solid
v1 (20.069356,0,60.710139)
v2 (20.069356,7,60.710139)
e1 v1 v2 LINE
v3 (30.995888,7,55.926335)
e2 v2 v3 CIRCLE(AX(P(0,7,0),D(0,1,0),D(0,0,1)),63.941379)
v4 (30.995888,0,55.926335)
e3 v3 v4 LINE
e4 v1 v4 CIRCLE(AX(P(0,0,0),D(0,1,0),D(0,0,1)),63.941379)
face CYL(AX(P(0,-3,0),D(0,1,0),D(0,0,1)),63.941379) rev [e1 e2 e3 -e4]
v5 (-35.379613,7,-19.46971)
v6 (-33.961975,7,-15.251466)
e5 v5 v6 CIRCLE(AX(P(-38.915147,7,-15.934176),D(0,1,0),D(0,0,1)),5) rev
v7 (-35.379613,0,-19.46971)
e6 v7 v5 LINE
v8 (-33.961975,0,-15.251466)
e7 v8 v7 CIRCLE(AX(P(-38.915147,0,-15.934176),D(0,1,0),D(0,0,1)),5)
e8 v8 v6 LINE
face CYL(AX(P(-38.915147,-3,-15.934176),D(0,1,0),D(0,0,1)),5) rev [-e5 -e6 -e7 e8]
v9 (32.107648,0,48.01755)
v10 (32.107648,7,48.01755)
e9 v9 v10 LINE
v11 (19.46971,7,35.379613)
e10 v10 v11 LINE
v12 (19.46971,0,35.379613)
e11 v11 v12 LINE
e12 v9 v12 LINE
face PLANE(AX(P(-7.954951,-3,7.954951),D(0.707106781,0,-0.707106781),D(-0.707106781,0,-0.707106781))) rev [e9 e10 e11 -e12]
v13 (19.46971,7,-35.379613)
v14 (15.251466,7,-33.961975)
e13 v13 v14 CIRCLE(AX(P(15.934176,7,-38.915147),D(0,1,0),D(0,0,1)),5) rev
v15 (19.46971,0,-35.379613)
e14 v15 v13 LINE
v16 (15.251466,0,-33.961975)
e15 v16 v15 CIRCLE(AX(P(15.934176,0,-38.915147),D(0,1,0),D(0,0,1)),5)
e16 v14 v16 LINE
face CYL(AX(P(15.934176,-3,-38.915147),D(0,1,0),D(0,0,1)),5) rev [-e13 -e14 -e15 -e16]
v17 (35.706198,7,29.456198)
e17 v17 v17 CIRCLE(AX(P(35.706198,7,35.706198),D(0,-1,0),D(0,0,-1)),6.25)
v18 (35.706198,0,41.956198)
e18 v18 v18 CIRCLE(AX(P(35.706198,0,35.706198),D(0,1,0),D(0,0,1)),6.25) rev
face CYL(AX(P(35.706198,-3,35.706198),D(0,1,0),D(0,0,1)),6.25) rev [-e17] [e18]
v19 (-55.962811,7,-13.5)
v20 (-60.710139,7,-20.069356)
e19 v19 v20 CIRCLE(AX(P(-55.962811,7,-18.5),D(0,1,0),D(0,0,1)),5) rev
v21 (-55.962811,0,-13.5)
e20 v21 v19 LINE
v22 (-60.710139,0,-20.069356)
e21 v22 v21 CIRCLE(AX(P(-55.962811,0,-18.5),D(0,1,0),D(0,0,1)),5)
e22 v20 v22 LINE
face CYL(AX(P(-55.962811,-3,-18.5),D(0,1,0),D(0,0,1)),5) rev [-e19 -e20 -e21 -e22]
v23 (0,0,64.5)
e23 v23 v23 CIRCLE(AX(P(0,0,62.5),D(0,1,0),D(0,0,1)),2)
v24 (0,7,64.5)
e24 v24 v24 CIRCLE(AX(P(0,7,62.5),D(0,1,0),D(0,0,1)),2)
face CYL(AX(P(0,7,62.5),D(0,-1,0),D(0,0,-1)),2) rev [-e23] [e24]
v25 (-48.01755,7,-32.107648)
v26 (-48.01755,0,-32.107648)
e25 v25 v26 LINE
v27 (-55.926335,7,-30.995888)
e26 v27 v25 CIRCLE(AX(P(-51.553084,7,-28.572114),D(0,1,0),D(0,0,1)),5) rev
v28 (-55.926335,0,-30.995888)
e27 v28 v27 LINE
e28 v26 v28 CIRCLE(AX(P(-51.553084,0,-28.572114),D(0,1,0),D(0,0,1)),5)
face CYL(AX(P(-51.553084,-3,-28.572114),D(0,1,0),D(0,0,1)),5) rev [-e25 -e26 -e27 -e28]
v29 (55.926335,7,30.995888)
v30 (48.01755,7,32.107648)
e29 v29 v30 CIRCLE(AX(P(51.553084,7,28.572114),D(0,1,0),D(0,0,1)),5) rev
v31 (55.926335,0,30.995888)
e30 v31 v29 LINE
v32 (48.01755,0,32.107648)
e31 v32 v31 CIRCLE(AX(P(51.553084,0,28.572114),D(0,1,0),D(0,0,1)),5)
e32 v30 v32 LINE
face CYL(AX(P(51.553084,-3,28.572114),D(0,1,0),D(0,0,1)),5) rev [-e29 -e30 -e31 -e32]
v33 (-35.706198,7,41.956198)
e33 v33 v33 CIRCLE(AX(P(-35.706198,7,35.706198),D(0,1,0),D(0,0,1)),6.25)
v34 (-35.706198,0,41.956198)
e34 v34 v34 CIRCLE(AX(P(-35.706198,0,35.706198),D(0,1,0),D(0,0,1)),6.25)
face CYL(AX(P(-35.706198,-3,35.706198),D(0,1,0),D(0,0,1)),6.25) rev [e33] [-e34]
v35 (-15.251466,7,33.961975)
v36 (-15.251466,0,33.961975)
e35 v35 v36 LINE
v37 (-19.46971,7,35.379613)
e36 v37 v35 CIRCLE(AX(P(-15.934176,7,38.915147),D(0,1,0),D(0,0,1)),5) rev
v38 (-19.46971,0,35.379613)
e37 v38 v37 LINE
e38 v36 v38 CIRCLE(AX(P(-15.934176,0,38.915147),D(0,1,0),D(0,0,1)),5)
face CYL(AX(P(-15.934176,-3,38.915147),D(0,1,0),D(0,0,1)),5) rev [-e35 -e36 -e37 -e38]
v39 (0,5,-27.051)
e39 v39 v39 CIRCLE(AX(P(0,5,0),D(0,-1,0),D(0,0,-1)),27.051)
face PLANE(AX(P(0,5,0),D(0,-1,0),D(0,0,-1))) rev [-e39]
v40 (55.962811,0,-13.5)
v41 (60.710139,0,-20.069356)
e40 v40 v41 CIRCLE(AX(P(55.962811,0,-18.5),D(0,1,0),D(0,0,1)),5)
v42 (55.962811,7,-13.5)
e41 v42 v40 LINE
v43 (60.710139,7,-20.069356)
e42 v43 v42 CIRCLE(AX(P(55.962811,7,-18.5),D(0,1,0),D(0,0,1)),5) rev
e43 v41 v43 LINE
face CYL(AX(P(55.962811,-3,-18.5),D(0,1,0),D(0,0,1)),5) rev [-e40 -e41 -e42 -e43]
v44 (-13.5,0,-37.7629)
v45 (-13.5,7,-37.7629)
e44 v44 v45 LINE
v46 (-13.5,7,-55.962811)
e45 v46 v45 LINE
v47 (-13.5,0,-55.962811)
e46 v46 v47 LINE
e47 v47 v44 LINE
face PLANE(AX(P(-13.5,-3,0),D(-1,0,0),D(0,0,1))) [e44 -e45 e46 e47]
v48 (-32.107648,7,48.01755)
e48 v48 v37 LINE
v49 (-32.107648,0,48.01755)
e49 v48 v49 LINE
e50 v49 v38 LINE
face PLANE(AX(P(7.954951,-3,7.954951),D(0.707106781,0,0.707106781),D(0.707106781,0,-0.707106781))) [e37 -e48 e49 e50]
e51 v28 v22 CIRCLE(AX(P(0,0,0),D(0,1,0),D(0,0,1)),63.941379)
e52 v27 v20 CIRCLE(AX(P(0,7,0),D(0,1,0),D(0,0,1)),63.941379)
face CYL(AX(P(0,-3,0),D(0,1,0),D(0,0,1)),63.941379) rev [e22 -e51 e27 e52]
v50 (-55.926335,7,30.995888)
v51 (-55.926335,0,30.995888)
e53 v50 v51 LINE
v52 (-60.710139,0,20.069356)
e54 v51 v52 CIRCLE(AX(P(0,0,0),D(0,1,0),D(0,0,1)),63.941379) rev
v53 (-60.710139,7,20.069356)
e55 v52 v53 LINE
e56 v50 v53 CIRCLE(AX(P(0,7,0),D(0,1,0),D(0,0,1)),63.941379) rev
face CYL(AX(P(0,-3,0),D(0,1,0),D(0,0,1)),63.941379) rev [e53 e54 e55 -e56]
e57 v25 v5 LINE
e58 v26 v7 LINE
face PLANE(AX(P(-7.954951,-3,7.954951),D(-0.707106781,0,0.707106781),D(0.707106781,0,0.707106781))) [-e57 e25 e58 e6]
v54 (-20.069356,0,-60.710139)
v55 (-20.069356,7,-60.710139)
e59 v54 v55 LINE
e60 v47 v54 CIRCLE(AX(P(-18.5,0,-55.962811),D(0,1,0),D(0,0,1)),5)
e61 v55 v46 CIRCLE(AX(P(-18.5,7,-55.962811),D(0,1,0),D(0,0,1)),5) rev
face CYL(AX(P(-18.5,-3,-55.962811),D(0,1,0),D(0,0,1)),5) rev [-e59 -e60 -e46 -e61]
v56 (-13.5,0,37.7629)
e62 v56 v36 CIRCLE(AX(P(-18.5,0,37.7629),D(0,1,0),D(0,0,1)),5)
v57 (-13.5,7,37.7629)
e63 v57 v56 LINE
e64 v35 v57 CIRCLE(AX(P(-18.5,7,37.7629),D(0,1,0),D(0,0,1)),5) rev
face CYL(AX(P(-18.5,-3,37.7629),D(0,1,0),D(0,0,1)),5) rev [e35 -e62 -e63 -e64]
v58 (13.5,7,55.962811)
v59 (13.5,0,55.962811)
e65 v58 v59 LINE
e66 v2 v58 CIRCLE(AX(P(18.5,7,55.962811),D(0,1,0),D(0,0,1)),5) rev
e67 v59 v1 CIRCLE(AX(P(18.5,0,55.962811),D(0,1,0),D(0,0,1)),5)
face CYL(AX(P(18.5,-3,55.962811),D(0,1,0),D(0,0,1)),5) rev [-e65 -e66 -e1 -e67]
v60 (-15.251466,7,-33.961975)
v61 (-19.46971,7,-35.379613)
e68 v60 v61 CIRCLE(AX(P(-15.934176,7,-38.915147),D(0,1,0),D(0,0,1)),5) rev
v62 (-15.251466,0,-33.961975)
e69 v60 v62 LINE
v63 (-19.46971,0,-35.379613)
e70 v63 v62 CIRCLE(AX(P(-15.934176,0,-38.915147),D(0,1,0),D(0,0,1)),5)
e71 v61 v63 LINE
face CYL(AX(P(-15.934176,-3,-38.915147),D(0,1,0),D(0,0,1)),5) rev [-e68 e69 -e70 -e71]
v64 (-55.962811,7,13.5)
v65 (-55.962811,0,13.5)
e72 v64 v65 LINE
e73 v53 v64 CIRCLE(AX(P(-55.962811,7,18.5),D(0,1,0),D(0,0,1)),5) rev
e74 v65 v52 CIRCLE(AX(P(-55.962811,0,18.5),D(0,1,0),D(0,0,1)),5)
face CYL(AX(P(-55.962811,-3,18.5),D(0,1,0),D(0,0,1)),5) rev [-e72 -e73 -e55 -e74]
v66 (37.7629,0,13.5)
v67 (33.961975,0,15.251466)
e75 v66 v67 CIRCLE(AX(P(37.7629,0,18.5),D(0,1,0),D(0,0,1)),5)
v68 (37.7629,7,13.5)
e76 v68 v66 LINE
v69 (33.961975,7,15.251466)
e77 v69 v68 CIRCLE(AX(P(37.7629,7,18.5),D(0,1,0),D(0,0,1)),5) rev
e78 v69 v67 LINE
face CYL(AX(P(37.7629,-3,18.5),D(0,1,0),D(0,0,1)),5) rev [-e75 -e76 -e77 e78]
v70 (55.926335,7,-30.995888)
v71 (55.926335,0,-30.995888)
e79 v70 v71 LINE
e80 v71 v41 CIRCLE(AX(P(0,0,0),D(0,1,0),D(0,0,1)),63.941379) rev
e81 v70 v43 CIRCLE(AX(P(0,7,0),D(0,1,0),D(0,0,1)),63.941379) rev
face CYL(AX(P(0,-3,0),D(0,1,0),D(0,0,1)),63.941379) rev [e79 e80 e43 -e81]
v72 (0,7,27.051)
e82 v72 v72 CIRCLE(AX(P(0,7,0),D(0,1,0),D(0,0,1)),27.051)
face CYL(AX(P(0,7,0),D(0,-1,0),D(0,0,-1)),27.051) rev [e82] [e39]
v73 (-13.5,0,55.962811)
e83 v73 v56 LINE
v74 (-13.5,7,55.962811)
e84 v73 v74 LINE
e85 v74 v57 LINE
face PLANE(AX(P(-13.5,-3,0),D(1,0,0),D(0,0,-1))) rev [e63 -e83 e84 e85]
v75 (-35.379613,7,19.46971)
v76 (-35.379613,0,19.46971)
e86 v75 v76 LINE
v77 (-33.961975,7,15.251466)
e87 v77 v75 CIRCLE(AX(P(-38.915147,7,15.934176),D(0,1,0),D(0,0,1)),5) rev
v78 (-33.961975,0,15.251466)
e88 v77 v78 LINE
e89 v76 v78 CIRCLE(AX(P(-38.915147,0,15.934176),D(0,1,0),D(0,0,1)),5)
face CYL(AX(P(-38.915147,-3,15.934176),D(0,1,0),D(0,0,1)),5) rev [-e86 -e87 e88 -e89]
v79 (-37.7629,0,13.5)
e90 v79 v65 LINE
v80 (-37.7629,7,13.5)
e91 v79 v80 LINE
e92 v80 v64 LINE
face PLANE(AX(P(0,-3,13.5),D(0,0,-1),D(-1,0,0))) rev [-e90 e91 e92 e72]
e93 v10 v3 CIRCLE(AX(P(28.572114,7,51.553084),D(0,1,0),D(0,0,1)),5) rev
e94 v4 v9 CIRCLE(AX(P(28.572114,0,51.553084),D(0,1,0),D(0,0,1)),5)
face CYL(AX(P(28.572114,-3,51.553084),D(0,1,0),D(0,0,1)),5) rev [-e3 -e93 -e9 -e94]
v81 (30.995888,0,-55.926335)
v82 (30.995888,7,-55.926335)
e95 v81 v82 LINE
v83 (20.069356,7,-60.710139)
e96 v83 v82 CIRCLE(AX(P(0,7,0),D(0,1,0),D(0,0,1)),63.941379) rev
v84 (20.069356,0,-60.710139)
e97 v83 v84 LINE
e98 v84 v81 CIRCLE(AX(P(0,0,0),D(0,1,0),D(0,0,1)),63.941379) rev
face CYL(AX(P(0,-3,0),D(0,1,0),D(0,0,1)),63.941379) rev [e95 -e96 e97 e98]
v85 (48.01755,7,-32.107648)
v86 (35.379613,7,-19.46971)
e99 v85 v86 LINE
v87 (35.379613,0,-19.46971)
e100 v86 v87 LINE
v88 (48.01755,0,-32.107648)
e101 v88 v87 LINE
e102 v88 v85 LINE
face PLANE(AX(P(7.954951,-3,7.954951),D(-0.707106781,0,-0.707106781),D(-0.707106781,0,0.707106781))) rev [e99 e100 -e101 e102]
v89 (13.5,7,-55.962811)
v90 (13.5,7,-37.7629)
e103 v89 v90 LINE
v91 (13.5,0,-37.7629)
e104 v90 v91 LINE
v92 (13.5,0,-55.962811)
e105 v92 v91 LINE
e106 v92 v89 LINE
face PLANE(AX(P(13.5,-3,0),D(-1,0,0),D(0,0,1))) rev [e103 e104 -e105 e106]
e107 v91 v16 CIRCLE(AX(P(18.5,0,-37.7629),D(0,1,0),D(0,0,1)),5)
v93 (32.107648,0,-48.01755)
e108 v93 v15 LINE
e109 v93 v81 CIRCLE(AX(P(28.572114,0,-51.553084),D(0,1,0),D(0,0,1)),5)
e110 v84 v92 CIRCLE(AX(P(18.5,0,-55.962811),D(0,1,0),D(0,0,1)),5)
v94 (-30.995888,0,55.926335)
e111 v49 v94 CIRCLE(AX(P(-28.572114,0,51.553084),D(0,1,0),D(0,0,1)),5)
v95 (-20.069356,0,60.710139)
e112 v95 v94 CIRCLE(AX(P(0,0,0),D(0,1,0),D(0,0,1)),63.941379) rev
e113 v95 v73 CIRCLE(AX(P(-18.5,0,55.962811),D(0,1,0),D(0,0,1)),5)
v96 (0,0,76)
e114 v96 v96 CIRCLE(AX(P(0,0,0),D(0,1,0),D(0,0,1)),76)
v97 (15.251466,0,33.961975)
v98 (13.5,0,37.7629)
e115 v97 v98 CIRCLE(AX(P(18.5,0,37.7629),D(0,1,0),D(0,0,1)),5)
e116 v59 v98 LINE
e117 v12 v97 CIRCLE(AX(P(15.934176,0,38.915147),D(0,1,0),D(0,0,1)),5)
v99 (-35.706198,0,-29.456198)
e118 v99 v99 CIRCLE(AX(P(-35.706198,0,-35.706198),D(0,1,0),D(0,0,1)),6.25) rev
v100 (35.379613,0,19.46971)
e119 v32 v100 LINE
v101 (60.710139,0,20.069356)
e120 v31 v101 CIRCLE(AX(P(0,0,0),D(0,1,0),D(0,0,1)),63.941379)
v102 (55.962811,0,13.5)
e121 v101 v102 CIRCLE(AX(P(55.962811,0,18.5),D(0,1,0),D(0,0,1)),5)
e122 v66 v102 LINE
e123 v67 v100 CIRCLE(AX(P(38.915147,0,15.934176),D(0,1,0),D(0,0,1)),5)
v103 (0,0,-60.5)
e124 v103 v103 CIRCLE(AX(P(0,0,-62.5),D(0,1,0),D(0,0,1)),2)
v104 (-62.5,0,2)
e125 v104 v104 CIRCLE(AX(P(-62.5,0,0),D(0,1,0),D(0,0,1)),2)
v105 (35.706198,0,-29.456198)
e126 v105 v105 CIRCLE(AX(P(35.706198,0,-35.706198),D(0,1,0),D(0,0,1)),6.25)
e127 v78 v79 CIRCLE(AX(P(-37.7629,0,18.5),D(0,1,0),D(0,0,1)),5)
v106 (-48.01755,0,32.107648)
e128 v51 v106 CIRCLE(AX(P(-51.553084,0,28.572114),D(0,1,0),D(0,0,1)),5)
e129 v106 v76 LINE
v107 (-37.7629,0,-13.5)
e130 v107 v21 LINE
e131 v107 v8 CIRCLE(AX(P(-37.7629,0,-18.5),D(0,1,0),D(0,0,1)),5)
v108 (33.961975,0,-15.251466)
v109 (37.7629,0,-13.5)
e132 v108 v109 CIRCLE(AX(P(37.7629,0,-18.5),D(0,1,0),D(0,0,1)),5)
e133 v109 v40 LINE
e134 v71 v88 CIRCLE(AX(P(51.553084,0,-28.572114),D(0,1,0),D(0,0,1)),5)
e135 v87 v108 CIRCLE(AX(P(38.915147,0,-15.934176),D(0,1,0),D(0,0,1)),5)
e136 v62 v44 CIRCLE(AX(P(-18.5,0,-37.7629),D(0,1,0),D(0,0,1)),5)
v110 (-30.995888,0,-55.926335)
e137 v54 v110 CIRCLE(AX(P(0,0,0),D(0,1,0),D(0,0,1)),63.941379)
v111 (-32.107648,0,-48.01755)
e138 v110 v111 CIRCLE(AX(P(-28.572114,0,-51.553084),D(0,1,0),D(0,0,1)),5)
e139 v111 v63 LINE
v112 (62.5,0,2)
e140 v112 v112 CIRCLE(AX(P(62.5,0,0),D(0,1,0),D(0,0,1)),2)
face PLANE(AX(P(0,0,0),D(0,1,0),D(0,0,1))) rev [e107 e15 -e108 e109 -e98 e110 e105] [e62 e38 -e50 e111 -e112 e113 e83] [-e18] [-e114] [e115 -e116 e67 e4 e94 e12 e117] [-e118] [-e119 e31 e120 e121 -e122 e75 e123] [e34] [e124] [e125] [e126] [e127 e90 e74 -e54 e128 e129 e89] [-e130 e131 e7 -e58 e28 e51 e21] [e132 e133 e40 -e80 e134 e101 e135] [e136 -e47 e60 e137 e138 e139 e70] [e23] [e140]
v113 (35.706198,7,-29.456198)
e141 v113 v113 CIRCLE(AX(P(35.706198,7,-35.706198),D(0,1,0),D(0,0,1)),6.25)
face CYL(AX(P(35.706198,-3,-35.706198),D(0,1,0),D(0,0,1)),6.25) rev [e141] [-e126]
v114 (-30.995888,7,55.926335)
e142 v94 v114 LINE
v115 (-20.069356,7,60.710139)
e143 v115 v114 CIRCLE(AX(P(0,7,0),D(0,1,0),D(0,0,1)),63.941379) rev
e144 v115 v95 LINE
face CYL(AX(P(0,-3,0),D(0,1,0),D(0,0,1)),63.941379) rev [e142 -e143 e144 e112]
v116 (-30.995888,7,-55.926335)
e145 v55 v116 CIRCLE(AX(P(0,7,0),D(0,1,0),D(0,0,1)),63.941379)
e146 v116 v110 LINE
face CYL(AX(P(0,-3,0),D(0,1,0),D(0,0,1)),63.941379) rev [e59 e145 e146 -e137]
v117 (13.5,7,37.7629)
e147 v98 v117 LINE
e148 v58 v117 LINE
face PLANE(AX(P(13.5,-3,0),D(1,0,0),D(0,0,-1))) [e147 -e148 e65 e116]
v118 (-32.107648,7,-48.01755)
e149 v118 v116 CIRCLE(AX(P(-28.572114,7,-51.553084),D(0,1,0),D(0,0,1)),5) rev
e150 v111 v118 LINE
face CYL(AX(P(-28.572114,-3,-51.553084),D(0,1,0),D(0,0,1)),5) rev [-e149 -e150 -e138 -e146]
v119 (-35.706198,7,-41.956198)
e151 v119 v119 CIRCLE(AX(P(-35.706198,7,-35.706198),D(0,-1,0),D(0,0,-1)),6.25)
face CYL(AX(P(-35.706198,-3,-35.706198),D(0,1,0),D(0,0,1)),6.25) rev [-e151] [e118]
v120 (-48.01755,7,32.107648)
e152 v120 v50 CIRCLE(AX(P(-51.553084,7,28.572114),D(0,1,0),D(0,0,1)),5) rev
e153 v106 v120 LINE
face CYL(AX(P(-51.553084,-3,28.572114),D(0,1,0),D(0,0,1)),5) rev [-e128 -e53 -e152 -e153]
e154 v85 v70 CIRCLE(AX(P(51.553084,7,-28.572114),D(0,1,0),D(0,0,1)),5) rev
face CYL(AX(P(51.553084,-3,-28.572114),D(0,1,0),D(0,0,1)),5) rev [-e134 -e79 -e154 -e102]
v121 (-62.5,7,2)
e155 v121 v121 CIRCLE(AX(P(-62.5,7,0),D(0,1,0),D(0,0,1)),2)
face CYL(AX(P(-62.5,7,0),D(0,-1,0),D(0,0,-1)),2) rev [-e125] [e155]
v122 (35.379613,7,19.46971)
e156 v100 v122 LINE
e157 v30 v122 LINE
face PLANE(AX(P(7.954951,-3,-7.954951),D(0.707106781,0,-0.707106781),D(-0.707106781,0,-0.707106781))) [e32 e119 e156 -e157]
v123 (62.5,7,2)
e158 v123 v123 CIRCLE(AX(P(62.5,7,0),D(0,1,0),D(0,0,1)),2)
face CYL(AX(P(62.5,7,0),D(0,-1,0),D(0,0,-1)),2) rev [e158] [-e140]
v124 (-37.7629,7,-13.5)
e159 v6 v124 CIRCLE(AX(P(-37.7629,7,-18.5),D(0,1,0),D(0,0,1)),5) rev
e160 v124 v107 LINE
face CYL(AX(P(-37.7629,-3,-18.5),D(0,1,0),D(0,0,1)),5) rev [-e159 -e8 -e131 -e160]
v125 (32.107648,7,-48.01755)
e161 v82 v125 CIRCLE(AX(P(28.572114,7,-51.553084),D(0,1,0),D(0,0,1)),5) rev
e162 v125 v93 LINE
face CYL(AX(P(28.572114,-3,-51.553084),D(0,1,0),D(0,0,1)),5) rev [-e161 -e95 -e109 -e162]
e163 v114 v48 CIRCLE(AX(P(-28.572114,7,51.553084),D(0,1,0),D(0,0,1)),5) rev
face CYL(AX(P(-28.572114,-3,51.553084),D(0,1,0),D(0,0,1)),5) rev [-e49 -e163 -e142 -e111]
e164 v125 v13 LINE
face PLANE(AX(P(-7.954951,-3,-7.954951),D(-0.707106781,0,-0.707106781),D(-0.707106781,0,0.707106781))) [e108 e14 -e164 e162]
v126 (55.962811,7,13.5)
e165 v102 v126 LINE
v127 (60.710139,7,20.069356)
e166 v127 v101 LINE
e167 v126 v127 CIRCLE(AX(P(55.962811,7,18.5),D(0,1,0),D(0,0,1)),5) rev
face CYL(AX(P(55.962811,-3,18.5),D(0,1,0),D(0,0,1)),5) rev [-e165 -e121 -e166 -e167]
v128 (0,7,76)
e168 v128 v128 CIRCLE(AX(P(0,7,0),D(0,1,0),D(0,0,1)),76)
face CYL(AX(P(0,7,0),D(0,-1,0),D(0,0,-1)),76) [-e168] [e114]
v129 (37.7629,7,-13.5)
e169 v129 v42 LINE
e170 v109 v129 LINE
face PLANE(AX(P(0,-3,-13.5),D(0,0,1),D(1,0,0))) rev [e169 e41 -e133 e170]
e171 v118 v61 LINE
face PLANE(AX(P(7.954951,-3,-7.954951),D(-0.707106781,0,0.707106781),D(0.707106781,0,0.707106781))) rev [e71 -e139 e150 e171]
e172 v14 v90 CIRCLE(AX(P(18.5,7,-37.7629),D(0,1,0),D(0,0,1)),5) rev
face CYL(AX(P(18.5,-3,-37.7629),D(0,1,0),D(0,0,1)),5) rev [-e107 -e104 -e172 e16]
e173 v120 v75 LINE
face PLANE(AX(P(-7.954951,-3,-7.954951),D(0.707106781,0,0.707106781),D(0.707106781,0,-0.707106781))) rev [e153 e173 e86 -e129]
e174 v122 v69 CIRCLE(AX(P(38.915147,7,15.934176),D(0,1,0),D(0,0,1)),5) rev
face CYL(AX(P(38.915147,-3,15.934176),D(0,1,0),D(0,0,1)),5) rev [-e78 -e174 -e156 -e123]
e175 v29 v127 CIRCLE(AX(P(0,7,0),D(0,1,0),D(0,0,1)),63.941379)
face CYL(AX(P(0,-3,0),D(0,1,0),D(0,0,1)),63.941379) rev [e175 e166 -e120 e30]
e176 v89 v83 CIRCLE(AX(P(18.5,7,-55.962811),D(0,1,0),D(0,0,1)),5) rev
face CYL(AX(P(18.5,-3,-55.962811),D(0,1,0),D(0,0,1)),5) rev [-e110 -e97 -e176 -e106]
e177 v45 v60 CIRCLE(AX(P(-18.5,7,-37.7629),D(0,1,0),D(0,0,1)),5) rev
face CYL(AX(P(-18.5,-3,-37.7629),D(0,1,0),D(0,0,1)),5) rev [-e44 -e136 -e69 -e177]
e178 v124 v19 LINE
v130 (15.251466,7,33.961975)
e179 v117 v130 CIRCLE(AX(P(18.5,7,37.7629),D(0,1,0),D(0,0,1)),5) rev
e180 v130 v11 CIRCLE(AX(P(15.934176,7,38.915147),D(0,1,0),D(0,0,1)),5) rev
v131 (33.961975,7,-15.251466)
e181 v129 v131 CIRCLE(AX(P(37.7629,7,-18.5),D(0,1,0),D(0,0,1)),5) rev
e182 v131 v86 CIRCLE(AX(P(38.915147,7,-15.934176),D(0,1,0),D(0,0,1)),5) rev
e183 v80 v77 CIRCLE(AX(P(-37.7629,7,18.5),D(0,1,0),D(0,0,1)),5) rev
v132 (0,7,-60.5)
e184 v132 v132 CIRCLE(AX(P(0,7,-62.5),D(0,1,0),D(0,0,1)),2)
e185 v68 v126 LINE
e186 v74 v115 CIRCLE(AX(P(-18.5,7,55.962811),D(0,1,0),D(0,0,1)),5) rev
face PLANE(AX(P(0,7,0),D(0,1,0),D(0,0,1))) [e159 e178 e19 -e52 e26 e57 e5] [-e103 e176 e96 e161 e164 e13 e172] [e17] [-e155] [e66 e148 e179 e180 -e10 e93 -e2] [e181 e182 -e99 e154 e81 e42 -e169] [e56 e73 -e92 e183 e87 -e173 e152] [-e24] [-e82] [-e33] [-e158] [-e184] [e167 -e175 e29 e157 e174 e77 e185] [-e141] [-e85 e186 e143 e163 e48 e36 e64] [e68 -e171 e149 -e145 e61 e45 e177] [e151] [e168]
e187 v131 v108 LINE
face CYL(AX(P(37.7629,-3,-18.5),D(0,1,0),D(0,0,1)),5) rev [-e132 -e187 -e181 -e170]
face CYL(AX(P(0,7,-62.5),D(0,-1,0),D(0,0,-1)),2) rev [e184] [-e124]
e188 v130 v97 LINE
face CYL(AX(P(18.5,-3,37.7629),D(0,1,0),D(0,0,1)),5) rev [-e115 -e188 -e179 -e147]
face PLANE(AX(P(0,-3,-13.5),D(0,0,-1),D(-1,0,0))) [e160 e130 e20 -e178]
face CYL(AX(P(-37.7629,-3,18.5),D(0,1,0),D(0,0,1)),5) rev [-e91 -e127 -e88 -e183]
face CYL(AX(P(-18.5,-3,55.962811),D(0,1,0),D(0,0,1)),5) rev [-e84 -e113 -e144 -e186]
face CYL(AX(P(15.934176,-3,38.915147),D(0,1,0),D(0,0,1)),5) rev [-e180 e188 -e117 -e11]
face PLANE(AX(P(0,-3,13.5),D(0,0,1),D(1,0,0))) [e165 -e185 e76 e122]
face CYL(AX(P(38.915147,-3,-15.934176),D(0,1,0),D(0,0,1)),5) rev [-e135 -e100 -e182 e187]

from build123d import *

# Parameters (mm, degrees)
SKETCH1_R           = 76
SKETCH1_R_2         = 27.051
SKETCH1_R_3         = 2
BOSS_EXTRUDE1_DEPTH = 7
SKETCH3_R           = 27.051
BOSS_EXTRUDE2_DEPTH = 5
SKETCH4_R           = 6.25
CUT_EXTRUDE1_DEPTH  = 10
FILLET1_R           = 5


with BuildPart() as part:
    # Sketch1 → Boss-Extrude1 (new body)
    with BuildSketch(Plane(origin=(0, 0, 0), x_dir=(1, 0, 0), z_dir=(0, 1, 0))):
        with Locations(Location((0, 0, 0), (0, 0, 270))):
            Circle(SKETCH1_R)
        with Locations(Location((0, 0, 0), (0, 0, 270))):
            Circle(SKETCH1_R_2, mode=Mode.SUBTRACT)
        with Locations(Location((0, 62.5, 0), (0, 0, 270))):
            Circle(SKETCH1_R_3, mode=Mode.SUBTRACT)
        with Locations(Location((62.5, 0, 0), (0, 0, 270))):
            Circle(SKETCH1_R_3, mode=Mode.SUBTRACT)
        with Locations(Location((0, -62.5, 0), (0, 0, 270))):
            Circle(SKETCH1_R_3, mode=Mode.SUBTRACT)
        with Locations(Location((-62.5, 0, 0), (0, 0, 270))):
            Circle(SKETCH1_R_3, mode=Mode.SUBTRACT)
    extrude(amount=BOSS_EXTRUDE1_DEPTH)

    # Sketch3 → Boss-Extrude2 (add)
    with BuildSketch(Plane.XZ):
        with Locations(Location((0, 0, 0), (0, 0, 270))):
            Circle(SKETCH3_R)
    extrude(amount=-BOSS_EXTRUDE2_DEPTH)

    # Sketch4 → Cut-Extrude1 (cut)
    with BuildSketch(Plane(origin=(0, 7, 0), x_dir=(1, 0, 0), z_dir=(0, 1, 0))):
        with BuildLine():
            Line((27.751246841, -43.661149418), (17.007161012, -32.917063589))
            ThreePointArc((17.007161012, -32.917063589), (15.274204293, -33.756114768), (13.5, -34.504008477))
            Line((13.5, -34.504008477), (13.5, -62.5))
            ThreePointArc((13.5, -62.5), (25.524772494, -58.625813335), (36.553123822, -52.463026398))
            Line((36.553123822, -52.463026398), (27.751246841, -43.661149418))
        make_face()
        with BuildLine():
            Line((62.5, -13.5), (34.504008477, -13.5))
            ThreePointArc((34.504008477, -13.5), (33.756114768, -15.274204293), (32.917063589, -17.007161012))
            Line((32.917063589, -17.007161012), (43.66114941, -27.751246833))
            Line((43.66114941, -27.751246833), (52.463026398, -36.553123822))
            ThreePointArc((52.463026398, -36.553123822), (58.625813335, -25.524772494), (62.5, -13.5))
        make_face()
        with BuildLine():
            ThreePointArc((-13.5, -34.504008477), (-15.274204293, -33.756114768), (-17.007161012, -32.917063589))
            Line((-17.007161012, -32.917063589), (-27.751246874, -43.66114945))
            Line((-27.751246874, -43.66114945), (-36.553123822, -52.463026398))
            ThreePointArc((-36.553123822, -52.463026398), (-25.524772494, -58.625813335), (-13.5, -62.5))
            Line((-13.5, -62.5), (-13.5, -34.504008477))
        make_face()
        with BuildLine():
            ThreePointArc((-32.917063589, -17.007161012), (-33.756114768, -15.274204293), (-34.504008477, -13.5))
            Line((-34.504008477, -13.5), (-62.5, -13.5))
            ThreePointArc((-62.5, -13.5), (-58.625813335, -25.524772494), (-52.463026398, -36.553123822))
            Line((-52.463026398, -36.553123822), (-43.661149471, -27.751246894))
            Line((-43.661149471, -27.751246894), (-32.917063589, -17.007161012))
        make_face()
        with BuildLine():
            ThreePointArc((-34.504008477, 13.5), (-33.756114768, 15.274204293), (-32.917063589, 17.007161012))
            Line((-32.917063589, 17.007161012), (-43.66114943, 27.751246854))
            Line((-43.66114943, 27.751246854), (-52.463026398, 36.553123822))
            ThreePointArc((-52.463026398, 36.553123822), (-58.625813335, 25.524772494), (-62.5, 13.5))
            Line((-62.5, 13.5), (-34.504008477, 13.5))
        make_face()
        with BuildLine():
            ThreePointArc((-17.007161012, 32.917063589), (-15.274204293, 33.756114768), (-13.5, 34.504008477))
            Line((-13.5, 34.504008477), (-13.5, 62.5))
            ThreePointArc((-13.5, 62.5), (-25.524772494, 58.625813335), (-36.553123822, 52.463026398))
            Line((-36.553123822, 52.463026398), (-27.751246874, 43.66114945))
            Line((-27.751246874, 43.66114945), (-17.007161012, 32.917063589))
        make_face()
        with BuildLine():
            ThreePointArc((36.553123822, 52.463026398), (25.524772494, 58.625813335), (13.5, 62.5))
            Line((13.5, 62.5), (13.5, 34.504008477))
            ThreePointArc((13.5, 34.504008477), (15.274204293, 33.756114768), (17.007161012, 32.917063589))
            Line((17.007161012, 32.917063589), (27.751246906, 43.661149483))
            Line((27.751246906, 43.661149483), (36.553123822, 52.463026398))
        make_face()
        with BuildLine():
            ThreePointArc((62.5, 13.5), (58.625813335, 25.524772494), (52.463026398, 36.553123822))
            Line((52.463026398, 36.553123822), (43.66114945, 27.751246874))
            Line((43.66114945, 27.751246874), (32.917063589, 17.007161012))
            ThreePointArc((32.917063589, 17.007161012), (33.756114768, 15.274204293), (34.504008477, 13.5))
            Line((34.504008477, 13.5), (62.5, 13.5))
        make_face()
        with Locations(Location((35.706198162, 35.706198162, 0), (0, 0, 270))):
            Circle(SKETCH4_R)
        with Locations(Location((35.706198162, -35.706198162, 0), (0, 0, 270))):
            Circle(SKETCH4_R)
        with Locations(Location((-35.706198162, -35.706198162, 0), (0, 0, 270))):
            Circle(SKETCH4_R)
        with Locations(Location((-35.706198162, 35.706198162, 0), (0, 0, 270))):
            Circle(SKETCH4_R)
    extrude(amount=-CUT_EXTRUDE1_DEPTH, mode=Mode.SUBTRACT)

    # Fillet1
    # the kernel refuses this fillet: 5 mm, written as the material it adds along each edge
    with BuildSketch(Plane(origin=(34.504008477, 7, 13.5), x_dir=(1, 0, 0), z_dir=(0, -1, 0)), Plane(origin=(13.5, 7, -34.504008477), x_dir=(0, 0, -1), z_dir=(0, -1, 0)), Plane(origin=(-34.504008477, 7, -13.5), x_dir=(-1, 0, 0), z_dir=(0, -1, 0)), Plane(origin=(-13.5, 7, 34.504008477), x_dir=(0, 0, 1), z_dir=(0, -1, 0))) as fillet1_piece_1:
        with BuildLine():
            CenterArc((3.258891319, 5), FILLET1_R, 206.100178987, 63.899821013)
            ThreePointArc((-1.231239688, 2.800290124), (-0.586707725, 1.412857227), (0, 0))
            Line((0, 0), (3.258891319, 0))
        make_face()
    extrude(amount=7)
    with BuildSketch(Plane(origin=(62.5, 7, 13.5), x_dir=(-1, 0, 0), z_dir=(0, -1, 0))) as fillet1_piece_2:
        with BuildLine():
            CenterArc((6.537189081, -5), FILLET1_R, 90, 108.2926811)
            ThreePointArc((1.789861186, -6.569355874), (0.807426008, -3.308519097), (0, 0))
            Line((0, 0), (6.537189081, 0))
        make_face()
    extrude(amount=7)
    with BuildSketch(Plane(origin=(52.463026398, 7, 36.553123822), x_dir=(-0.7071067811865521, 0, -0.707106781186543), z_dir=(0, -1, 0)), Plane(origin=(-36.553123822, 7, 52.463026398), x_dir=(0.7071067811865515, 0, -0.7071067811865436), z_dir=(0, -1, 0))) as fillet1_piece_3:
        with BuildLine():
            CenterArc((6.286852353, 5), FILLET1_R, 163.996405934, 106.003594066)
            ThreePointArc((1.480630334, 6.378488268), (0.658610883, 3.208210045), (0, 0))
            Line((0, 0), (6.286852353, 0))
        make_face()
    extrude(amount=7)
    with BuildSketch(Plane(origin=(32.917063589, 7, 17.007161012), x_dir=(0.4193809358930841, 0, -0.907810349472532), z_dir=(0, -1, 0)), Plane(origin=(17.007161012, 7, -32.917063589), x_dir=(-0.9078103494725283, 0, -0.41938093589309267), z_dir=(0, -1, 0)), Plane(origin=(-32.917063589, 7, -17.007161012), x_dir=(-0.4193809358930852, 0, 0.9078103494725317), z_dir=(0, -1, 0))) as fillet1_piece_4:
        with BuildLine():
            CenterArc((3.489548398, 4.995132399), FILLET1_R, 200.204490443, 67.267112024)
            Line((-1.202781391, 3.268273647), (0, 0))
            ThreePointArc((0, 0), (1.634487847, 0.036069898), (3.268975694, 0))
        make_face()
    extrude(amount=7)
    with BuildSketch(Plane(origin=(32.917063589, 7, -17.007161012), x_dir=(0.7071067811865526, 0, -0.7071067811865425), z_dir=(0, -1, 0)), Plane(origin=(-17.007161012, 7, -32.917063589), x_dir=(-0.7071067811865506, 0, -0.7071067811865445), z_dir=(0, -1, 0)), Plane(origin=(-32.917063589, 7, 17.007161012), x_dir=(-0.7071067811865506, 0, 0.7071067811865445), z_dir=(0, -1, 0)), Plane(origin=(17.007161012, 7, 32.917063589), x_dir=(0.7071067811865501, 0, 0.707106781186545), z_dir=(0, -1, 0))) as fillet1_piece_5:
        with BuildLine():
            CenterArc((3.482570273, 5), FILLET1_R, 202.732887976, 67.267112024)
            ThreePointArc((-1.129011858, 3.067822406), (-0.530655558, 1.546368727), (0, 0))
            Line((0, 0), (3.482570273, 0))
        make_face()
    extrude(amount=7)
    with BuildSketch(Plane(origin=(34.504008477, 7, -13.5), x_dir=(1, 0, 0), z_dir=(0, -1, 0))) as fillet1_piece_6:
        with BuildLine():
            CenterArc((3.258891319, -5), FILLET1_R, 90, 63.899821013)
            ThreePointArc((-1.231239688, -2.800290124), (-0.586707725, -1.412857227), (0, 0))
            Line((0, 0), (3.258891319, 0))
        make_face()
    extrude(amount=7)
    with BuildSketch(Plane(origin=(62.5, 7, -13.5), x_dir=(-1, 0, 0), z_dir=(0, -1, 0)), Plane(origin=(-13.5, 7, -62.5), x_dir=(0, 0, 1), z_dir=(0, -1, 0)), Plane(origin=(-62.5, 7, 13.5), x_dir=(1, 0, 0), z_dir=(0, -1, 0)), Plane(origin=(13.5, 7, 62.5), x_dir=(0, 0, -1), z_dir=(0, -1, 0))) as fillet1_piece_7:
        with BuildLine():
            CenterArc((6.537189081, 5), FILLET1_R, 161.7073189, 108.2926811)
            ThreePointArc((1.789861186, 6.569355874), (0.807426008, 3.308519097), (0, 0))
            Line((0, 0), (6.537189081, 0))
        make_face()
    extrude(amount=7)
    with BuildSketch(Plane(origin=(52.463026398, 7, -36.553123822), x_dir=(0.5289042688396526, 0, 0.848681491728901), z_dir=(0, -1, 0))) as fillet1_piece_8:
        with BuildLine():
            CenterArc((6.292063112, 4.993441128), FILLET1_R, 166.931450544, 106.003594066)
            Line((1.421561948, 6.124024341), (0, 0))
            ThreePointArc((0, 0), (3.274041034, -0.08387667), (6.548082068, 0))
        make_face()
    extrude(amount=7)
    with BuildSketch(Plane(origin=(36.553123822, 7, -52.463026398), x_dir=(-0.8486814917288963, 0, -0.52890426883966), z_dir=(0, -1, 0)), Plane(origin=(-52.463026398, 7, -36.553123822), x_dir=(-0.5289042688396536, 0, 0.8486814917289003), z_dir=(0, -1, 0))) as fillet1_piece_9:
        with BuildLine():
            CenterArc((6.292063112, -4.993441128), FILLET1_R, 87.06495539, 106.003594066)
            Line((1.421561948, -6.124024341), (0, 0))
            ThreePointArc((0, 0), (3.274041034, 0.08387667), (6.548082068, 0))
        make_face()
    extrude(amount=7)
    with BuildSketch(Plane(origin=(13.5, 7, -62.5), x_dir=(0.9648302017860143, 0, 0.26287388938720957), z_dir=(0, -1, 0)), Plane(origin=(-62.5, 7, -13.5), x_dir=(0.2628738893872084, 0, -0.9648302017860146), z_dir=(0, -1, 0)), Plane(origin=(-13.5, 7, 62.5), x_dir=(-0.9648302017860145, 0, -0.26287388938720885), z_dir=(0, -1, 0))) as fillet1_piece_10:
        with BuildLine():
            CenterArc((6.542607328, 4.992908013), FILLET1_R, 164.759342849, 108.2926811)
            Line((1.718456319, 6.30727746), (0, 0))
            ThreePointArc((0, 0), (3.404410363, -0.090694285), (6.808820725, 0))
        make_face()
    extrude(amount=7)
    with BuildSketch(Plane(origin=(-36.553123822, 7, -52.463026398), x_dir=(0.707106781186552, 0, 0.7071067811865429), z_dir=(0, -1, 0)), Plane(origin=(-52.463026398, 7, 36.553123822), x_dir=(0.7071067811865515, 0, -0.7071067811865436), z_dir=(0, -1, 0)), Plane(origin=(36.553123822, 7, 52.463026398), x_dir=(-0.7071067811865527, 0, -0.7071067811865425), z_dir=(0, -1, 0))) as fillet1_piece_11:
        with BuildLine():
            CenterArc((6.286852353, -5), FILLET1_R, 90, 106.003594066)
            ThreePointArc((1.480630334, -6.378488268), (0.658610883, -3.208210045), (0, 0))
            Line((0, 0), (6.286852353, 0))
        make_face()
    extrude(amount=7)
    with BuildSketch(Plane(origin=(-13.5, 7, -34.504008477), x_dir=(-0.9154220062230544, 0, 0.4024954043496127), z_dir=(0, -1, 0)), Plane(origin=(-34.504008477, 7, 13.5), x_dir=(0.4024954043496181, 0, 0.915422006223052), z_dir=(0, -1, 0)), Plane(origin=(13.5, 7, 34.504008477), x_dir=(0.915422006223051, 0, -0.40249540434962), z_dir=(0, -1, 0))) as fillet1_piece_12:
        with BuildLine():
            CenterArc((3.265421252, 4.995737851), FILLET1_R, 203.734271223, 63.899821013)
            Line((-1.311688779, 2.983260829), (0, 0))
            ThreePointArc((0, 0), (1.52950776, 0.031583378), (3.059015519, 0))
        make_face()
    extrude(amount=7)
    with BuildSketch(Plane(origin=(-17.007161012, 7, 32.917063589), x_dir=(-0.7071067811865496, 0, 0.7071067811865455), z_dir=(0, -1, 0))) as fillet1_piece_13:
        with BuildLine():
            CenterArc((3.482570273, -5), FILLET1_R, 90, 67.267112024)
            ThreePointArc((-1.129011858, -3.067822406), (-0.530655558, -1.546368727), (0, 0))
            Line((0, 0), (3.482570273, 0))
        make_face()
    extrude(amount=7)


solid = part.part
